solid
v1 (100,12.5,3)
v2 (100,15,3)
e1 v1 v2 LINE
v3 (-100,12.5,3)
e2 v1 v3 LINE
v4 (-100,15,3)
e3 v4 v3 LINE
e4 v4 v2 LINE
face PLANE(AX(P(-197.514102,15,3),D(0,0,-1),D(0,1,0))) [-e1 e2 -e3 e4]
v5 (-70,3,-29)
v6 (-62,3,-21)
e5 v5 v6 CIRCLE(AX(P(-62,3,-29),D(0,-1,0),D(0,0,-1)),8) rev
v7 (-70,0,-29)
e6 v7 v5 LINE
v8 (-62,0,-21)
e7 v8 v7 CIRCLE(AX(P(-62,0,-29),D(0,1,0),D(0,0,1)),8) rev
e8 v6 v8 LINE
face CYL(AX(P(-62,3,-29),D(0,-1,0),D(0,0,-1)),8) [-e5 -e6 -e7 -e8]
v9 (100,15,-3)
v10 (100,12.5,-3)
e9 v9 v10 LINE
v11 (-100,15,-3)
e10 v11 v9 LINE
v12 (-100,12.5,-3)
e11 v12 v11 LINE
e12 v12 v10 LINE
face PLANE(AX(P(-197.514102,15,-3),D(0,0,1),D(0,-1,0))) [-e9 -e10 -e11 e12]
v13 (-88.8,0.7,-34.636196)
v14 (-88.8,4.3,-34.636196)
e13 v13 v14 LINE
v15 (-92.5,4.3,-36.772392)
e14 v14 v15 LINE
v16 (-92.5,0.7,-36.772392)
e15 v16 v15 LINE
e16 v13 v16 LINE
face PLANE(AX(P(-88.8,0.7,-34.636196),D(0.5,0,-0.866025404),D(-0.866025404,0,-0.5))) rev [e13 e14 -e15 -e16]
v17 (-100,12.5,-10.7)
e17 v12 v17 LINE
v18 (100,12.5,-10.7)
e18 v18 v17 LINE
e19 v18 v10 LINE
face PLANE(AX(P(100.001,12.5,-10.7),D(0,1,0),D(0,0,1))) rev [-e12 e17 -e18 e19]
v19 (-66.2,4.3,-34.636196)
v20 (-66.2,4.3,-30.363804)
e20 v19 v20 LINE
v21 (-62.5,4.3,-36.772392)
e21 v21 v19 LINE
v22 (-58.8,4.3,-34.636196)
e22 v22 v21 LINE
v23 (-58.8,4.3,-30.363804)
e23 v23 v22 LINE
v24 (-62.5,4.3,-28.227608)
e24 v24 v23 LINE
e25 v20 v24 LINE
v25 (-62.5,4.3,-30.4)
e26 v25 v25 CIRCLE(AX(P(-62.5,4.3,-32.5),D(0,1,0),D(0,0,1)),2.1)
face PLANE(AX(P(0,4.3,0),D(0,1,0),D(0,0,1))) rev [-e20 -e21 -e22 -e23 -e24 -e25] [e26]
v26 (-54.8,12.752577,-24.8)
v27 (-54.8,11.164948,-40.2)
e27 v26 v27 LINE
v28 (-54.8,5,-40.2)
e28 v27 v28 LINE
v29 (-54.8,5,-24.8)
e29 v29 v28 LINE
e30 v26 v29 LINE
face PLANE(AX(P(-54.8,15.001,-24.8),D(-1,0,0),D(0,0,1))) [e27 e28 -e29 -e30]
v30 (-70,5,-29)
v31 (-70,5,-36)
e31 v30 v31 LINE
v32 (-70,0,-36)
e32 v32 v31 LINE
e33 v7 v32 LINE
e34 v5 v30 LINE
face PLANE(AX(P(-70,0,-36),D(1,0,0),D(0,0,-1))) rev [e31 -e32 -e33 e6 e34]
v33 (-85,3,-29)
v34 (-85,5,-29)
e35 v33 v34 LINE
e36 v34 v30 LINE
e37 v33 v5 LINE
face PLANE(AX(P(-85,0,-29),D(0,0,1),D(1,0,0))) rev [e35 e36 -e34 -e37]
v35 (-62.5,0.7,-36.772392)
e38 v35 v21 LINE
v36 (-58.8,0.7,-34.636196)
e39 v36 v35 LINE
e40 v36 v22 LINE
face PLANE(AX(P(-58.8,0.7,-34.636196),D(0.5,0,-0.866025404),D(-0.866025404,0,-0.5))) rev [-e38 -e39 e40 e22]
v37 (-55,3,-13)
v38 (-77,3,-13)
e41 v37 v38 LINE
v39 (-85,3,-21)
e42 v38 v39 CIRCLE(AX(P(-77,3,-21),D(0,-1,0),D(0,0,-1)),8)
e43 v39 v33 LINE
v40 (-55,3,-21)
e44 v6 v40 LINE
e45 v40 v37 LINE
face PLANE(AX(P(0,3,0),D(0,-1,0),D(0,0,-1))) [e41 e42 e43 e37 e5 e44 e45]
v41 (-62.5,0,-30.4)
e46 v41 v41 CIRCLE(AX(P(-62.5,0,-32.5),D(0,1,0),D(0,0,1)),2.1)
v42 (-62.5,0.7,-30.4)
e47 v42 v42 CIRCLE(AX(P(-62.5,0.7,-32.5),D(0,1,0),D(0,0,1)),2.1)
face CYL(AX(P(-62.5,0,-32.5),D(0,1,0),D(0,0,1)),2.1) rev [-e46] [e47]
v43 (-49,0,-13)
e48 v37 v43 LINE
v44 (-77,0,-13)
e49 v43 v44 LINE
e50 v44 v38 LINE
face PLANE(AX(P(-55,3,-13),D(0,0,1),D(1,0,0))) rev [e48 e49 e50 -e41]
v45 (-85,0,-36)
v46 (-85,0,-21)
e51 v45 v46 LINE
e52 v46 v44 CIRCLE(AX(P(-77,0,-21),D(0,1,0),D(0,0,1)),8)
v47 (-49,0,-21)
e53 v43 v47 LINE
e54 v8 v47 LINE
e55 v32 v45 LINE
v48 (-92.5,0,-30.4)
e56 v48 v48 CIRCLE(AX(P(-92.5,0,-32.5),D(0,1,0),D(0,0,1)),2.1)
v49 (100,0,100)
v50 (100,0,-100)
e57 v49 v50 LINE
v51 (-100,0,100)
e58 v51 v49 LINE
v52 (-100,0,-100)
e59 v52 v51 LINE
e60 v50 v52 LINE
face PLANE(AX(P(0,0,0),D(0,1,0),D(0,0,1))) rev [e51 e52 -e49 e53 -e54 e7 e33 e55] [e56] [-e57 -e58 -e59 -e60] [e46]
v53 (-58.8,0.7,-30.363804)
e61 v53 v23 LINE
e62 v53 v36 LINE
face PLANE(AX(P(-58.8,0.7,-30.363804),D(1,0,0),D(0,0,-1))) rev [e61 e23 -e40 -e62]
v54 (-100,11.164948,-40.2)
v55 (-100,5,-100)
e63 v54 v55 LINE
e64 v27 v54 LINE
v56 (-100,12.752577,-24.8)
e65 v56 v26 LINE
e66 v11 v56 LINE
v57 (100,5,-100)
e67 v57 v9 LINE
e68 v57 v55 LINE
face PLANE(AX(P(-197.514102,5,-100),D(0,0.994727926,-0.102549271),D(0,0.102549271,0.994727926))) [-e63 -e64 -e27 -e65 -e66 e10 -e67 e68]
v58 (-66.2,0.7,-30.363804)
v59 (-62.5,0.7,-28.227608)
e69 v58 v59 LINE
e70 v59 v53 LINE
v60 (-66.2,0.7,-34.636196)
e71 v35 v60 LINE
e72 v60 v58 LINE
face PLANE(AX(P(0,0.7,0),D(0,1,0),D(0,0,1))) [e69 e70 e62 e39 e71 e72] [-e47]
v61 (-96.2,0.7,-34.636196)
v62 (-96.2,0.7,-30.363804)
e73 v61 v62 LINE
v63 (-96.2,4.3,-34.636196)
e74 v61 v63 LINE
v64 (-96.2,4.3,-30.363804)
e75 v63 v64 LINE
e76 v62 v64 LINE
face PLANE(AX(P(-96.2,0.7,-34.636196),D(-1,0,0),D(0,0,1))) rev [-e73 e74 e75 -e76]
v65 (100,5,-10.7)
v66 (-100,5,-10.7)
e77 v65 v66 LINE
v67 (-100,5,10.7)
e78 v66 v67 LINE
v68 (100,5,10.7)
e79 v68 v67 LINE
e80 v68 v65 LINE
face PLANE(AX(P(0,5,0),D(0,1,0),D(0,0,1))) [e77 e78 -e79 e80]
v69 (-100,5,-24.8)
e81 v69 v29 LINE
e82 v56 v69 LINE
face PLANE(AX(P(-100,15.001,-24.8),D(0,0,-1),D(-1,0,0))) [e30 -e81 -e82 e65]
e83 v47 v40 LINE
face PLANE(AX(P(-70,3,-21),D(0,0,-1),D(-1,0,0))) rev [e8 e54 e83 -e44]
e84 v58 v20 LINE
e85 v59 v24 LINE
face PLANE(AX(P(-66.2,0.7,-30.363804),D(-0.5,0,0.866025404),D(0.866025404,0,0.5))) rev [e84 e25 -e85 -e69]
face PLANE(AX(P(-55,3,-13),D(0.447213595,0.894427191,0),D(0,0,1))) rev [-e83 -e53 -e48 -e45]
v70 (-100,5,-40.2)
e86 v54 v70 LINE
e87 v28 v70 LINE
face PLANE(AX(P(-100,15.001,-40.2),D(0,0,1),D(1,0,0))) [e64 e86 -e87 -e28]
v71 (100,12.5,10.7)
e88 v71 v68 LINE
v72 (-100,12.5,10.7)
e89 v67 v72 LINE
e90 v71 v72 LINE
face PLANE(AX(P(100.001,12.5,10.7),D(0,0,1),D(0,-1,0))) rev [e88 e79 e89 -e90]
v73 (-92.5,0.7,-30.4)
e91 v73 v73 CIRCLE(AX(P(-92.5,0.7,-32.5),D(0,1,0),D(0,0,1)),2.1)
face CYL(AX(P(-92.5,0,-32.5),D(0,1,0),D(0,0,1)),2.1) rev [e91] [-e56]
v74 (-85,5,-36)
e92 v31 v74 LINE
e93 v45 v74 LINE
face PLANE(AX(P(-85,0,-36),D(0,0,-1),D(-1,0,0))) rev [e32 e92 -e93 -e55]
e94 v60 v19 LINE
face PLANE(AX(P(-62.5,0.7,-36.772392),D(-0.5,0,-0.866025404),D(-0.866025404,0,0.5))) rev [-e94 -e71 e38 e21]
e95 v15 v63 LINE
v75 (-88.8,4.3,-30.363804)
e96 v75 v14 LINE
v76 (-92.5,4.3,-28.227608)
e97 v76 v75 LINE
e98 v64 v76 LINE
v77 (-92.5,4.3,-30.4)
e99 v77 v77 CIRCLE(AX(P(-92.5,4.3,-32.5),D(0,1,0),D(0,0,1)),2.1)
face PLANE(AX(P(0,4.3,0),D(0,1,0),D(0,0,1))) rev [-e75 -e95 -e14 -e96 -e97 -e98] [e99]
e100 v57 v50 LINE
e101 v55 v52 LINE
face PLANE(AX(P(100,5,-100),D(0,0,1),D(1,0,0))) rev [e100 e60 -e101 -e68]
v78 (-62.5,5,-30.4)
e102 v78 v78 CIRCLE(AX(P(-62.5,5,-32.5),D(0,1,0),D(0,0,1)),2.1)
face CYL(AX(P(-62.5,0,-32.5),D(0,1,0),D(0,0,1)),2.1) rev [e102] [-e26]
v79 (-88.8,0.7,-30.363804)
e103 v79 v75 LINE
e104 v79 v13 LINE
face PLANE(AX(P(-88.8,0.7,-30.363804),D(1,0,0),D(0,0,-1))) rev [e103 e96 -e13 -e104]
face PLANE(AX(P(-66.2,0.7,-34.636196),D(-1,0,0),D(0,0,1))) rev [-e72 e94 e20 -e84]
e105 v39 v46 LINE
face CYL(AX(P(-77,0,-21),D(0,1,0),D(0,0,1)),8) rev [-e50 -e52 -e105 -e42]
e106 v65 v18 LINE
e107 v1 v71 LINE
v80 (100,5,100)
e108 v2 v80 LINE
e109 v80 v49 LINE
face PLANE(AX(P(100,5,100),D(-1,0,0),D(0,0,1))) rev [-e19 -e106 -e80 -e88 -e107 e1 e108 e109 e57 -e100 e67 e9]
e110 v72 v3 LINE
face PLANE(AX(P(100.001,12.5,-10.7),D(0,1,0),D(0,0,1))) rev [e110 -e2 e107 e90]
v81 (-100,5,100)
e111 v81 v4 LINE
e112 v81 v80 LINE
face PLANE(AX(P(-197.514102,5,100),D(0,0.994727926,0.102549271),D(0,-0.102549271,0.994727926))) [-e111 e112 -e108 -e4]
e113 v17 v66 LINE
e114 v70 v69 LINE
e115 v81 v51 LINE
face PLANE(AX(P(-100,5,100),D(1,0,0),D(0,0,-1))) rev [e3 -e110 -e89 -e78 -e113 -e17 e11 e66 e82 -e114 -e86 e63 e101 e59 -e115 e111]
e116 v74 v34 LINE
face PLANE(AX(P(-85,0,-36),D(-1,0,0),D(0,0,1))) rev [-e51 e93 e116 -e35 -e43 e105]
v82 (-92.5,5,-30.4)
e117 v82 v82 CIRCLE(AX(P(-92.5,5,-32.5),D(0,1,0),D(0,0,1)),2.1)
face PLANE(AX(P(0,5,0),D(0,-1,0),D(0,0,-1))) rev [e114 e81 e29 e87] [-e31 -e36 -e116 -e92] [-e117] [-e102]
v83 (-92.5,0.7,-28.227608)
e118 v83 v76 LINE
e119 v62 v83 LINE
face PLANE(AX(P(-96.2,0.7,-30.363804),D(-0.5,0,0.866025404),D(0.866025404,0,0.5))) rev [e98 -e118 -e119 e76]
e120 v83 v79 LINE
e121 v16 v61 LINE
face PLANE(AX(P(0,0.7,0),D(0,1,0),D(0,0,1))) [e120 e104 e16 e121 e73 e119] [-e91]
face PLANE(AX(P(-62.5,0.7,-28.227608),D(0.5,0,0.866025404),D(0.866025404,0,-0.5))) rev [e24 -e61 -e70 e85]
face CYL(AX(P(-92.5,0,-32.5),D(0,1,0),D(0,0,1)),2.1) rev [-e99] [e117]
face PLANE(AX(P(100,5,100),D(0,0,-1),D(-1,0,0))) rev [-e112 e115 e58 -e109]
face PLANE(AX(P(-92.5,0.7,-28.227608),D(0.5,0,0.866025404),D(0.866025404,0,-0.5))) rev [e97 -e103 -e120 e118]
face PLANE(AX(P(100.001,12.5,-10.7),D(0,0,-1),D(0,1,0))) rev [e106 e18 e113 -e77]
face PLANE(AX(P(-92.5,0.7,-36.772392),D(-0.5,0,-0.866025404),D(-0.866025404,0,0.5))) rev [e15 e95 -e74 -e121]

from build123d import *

# Parameters (mm, degrees)
SKETCH1_W           = 200
SKETCH1_H           = 200
BOSS_EXTRUDE1_DEPTH = 5
SKETCH8_W           = 15
SKETCH8_H           = 7
CUT_EXTRUDE4_DEPTH  = 142.509716981
BOSS_EXTRUDE2_DEPTH = 200
CUT_EXTRUDE6_REACH  = 143.774
SKETCH10_W          = 45.2
SKETCH10_H          = 15.4
CUT_EXTRUDE7_START  = -0.7
CUT_EXTRUDE7_DEPTH  = 3.6
SKETCH12_R          = 2.1
CUT_EXTRUDE8_DEPTH  = 142.774468788
CUT_EXTRUDE9_START  = -200
SKETCH13_W          = 21.4
SKETCH13_H          = 7.5
CUT_EXTRUDE9_DEPTH  = 200
CUT_EXTRUDE12_DEPTH = 3
FILLET1_R           = 8
CHAMFER1_SIZE2      = 6
CHAMFER1_SIZE       = 3


with BuildPart() as part:
    # Sketch1 → Boss-Extrude1 (new body)
    with BuildSketch(Plane(origin=(0, 0, 0), x_dir=(1, 0, 0), z_dir=(0, 1, 0))):
        Rectangle(SKETCH1_W, SKETCH1_H)
    extrude(amount=BOSS_EXTRUDE1_DEPTH)

    # Sketch8 → Cut-Extrude4 (cut, through all)
    with BuildSketch(Plane(origin=(0, 5, 0), x_dir=(1, 0, 0), z_dir=(0, 1, 0))):
        with Locations((-77.5, 32.5)):
            Rectangle(SKETCH8_W, SKETCH8_H)
    extrude(amount=-CUT_EXTRUDE4_DEPTH, mode=Mode.SUBTRACT)

    # Sketch9 → Boss-Extrude2 (add)
    with BuildSketch(Plane(origin=(100, 0, 0), x_dir=(0, 0, -1), z_dir=(1, 0, 0))):
        Polygon((-100, 5), (-3, 15), (-3, 5), align=None)
        Polygon((3, 5), (100, 5), (3, 15), align=None)
    extrude(amount=-BOSS_EXTRUDE2_DEPTH)

    # Cut-Extrude6: up to this plane
    cut_extrude6_end = Plane(origin=(-197.514101544, 5, -100), z_dir=(0, 0.9947279261542806, -0.1025492707375547))
    # Sketch10 → Cut-Extrude6 (cut, up to the surface)
    with BuildSketch(Plane(origin=(0, 5, 0), x_dir=(1, 0, 0), z_dir=(0, 1, 0)), mode=Mode.PRIVATE) as cut_extrude6_sk1:
        with Locations((-77.4, 32.5)):
            Rectangle(SKETCH10_W, SKETCH10_H)
    cut_extrude6_tool1 = split(extrude(cut_extrude6_sk1.sketch, amount=CUT_EXTRUDE6_REACH, mode=Mode.PRIVATE), bisect_by=cut_extrude6_end, keep=Keep.BOTH, mode=Mode.PRIVATE)
    add(cut_extrude6_tool1.solids().sort_by_distance((-77.4, 5, -32.5))[0], mode=Mode.SUBTRACT)

    # Sketch11 → Cut-Extrude7 (cut)
    with BuildSketch(Plane(origin=(0, 5, 0), x_dir=(1, 0, 0), z_dir=(0, 1, 0)).offset(CUT_EXTRUDE7_START)):
        Polygon((-92.5, 36.772391992), (-96.2, 34.636195996), (-96.2, 30.363804004), (-92.5, 28.227608008), (-88.8, 30.363804004), (-88.8, 34.636195996), align=None)
        Polygon((-62.5, 36.772391992), (-66.2, 34.636195996), (-66.2, 30.363804004), (-62.5, 28.227608008), (-58.8, 30.363804004), (-58.8, 34.636195996), align=None)
    extrude(amount=-CUT_EXTRUDE7_DEPTH, mode=Mode.SUBTRACT)

    # Sketch12 → Cut-Extrude8 (cut, through all)
    with BuildSketch(Plane(origin=(0, 5, 0), x_dir=(1, 0, 0), z_dir=(0, 1, 0))):
        with Locations(Location((-92.5, 32.5, 0), (0, 0, 270))):
            Circle(SKETCH12_R)
        with Locations(Location((-62.5, 32.5, 0), (0, 0, 270))):
            Circle(SKETCH12_R)
    extrude(amount=-CUT_EXTRUDE8_DEPTH, mode=Mode.SUBTRACT)

    # Sketch13 → Cut-Extrude9 (cut)
    with BuildSketch(Plane.ZY.offset(100).offset(CUT_EXTRUDE9_START)):
        with Locations((0, 8.75)):
            Rectangle(SKETCH13_W, SKETCH13_H)
    extrude(amount=CUT_EXTRUDE9_DEPTH, mode=Mode.SUBTRACT)

    # Sketch16 → Cut-Extrude12 (cut)
    with BuildSketch(Plane.XZ):
        Polygon((-85, -29), (-85, -13), (-55, -13), (-55, -21), (-70, -21), (-70, -29), align=None)
    extrude(amount=-CUT_EXTRUDE12_DEPTH, mode=Mode.SUBTRACT)

    # Fillet1
    fillet1_edges = [part.edges().sort_by_distance(p)[0] for p in [
        (-70, 1.5, -21),
        (-85, 1.5, -13),
    ]]
    fillet(fillet1_edges, radius=FILLET1_R)

    # Chamfer1
    chamfer1_edges = [part.edges().sort_by_distance(p)[0] for p in [
        (-55, 0, -17),
    ]]
    chamfer1_side = [part.faces().sort_by_distance(p)[0] for p in [
        (-55, 0.06, -17),
    ]]
    chamfer(chamfer1_edges, length=CHAMFER1_SIZE - 0.0001, length2=CHAMFER1_SIZE2 - 0.0001, reference=chamfer1_side[0])  # a hair under: the kernel refuses the full size


solid = part.part
